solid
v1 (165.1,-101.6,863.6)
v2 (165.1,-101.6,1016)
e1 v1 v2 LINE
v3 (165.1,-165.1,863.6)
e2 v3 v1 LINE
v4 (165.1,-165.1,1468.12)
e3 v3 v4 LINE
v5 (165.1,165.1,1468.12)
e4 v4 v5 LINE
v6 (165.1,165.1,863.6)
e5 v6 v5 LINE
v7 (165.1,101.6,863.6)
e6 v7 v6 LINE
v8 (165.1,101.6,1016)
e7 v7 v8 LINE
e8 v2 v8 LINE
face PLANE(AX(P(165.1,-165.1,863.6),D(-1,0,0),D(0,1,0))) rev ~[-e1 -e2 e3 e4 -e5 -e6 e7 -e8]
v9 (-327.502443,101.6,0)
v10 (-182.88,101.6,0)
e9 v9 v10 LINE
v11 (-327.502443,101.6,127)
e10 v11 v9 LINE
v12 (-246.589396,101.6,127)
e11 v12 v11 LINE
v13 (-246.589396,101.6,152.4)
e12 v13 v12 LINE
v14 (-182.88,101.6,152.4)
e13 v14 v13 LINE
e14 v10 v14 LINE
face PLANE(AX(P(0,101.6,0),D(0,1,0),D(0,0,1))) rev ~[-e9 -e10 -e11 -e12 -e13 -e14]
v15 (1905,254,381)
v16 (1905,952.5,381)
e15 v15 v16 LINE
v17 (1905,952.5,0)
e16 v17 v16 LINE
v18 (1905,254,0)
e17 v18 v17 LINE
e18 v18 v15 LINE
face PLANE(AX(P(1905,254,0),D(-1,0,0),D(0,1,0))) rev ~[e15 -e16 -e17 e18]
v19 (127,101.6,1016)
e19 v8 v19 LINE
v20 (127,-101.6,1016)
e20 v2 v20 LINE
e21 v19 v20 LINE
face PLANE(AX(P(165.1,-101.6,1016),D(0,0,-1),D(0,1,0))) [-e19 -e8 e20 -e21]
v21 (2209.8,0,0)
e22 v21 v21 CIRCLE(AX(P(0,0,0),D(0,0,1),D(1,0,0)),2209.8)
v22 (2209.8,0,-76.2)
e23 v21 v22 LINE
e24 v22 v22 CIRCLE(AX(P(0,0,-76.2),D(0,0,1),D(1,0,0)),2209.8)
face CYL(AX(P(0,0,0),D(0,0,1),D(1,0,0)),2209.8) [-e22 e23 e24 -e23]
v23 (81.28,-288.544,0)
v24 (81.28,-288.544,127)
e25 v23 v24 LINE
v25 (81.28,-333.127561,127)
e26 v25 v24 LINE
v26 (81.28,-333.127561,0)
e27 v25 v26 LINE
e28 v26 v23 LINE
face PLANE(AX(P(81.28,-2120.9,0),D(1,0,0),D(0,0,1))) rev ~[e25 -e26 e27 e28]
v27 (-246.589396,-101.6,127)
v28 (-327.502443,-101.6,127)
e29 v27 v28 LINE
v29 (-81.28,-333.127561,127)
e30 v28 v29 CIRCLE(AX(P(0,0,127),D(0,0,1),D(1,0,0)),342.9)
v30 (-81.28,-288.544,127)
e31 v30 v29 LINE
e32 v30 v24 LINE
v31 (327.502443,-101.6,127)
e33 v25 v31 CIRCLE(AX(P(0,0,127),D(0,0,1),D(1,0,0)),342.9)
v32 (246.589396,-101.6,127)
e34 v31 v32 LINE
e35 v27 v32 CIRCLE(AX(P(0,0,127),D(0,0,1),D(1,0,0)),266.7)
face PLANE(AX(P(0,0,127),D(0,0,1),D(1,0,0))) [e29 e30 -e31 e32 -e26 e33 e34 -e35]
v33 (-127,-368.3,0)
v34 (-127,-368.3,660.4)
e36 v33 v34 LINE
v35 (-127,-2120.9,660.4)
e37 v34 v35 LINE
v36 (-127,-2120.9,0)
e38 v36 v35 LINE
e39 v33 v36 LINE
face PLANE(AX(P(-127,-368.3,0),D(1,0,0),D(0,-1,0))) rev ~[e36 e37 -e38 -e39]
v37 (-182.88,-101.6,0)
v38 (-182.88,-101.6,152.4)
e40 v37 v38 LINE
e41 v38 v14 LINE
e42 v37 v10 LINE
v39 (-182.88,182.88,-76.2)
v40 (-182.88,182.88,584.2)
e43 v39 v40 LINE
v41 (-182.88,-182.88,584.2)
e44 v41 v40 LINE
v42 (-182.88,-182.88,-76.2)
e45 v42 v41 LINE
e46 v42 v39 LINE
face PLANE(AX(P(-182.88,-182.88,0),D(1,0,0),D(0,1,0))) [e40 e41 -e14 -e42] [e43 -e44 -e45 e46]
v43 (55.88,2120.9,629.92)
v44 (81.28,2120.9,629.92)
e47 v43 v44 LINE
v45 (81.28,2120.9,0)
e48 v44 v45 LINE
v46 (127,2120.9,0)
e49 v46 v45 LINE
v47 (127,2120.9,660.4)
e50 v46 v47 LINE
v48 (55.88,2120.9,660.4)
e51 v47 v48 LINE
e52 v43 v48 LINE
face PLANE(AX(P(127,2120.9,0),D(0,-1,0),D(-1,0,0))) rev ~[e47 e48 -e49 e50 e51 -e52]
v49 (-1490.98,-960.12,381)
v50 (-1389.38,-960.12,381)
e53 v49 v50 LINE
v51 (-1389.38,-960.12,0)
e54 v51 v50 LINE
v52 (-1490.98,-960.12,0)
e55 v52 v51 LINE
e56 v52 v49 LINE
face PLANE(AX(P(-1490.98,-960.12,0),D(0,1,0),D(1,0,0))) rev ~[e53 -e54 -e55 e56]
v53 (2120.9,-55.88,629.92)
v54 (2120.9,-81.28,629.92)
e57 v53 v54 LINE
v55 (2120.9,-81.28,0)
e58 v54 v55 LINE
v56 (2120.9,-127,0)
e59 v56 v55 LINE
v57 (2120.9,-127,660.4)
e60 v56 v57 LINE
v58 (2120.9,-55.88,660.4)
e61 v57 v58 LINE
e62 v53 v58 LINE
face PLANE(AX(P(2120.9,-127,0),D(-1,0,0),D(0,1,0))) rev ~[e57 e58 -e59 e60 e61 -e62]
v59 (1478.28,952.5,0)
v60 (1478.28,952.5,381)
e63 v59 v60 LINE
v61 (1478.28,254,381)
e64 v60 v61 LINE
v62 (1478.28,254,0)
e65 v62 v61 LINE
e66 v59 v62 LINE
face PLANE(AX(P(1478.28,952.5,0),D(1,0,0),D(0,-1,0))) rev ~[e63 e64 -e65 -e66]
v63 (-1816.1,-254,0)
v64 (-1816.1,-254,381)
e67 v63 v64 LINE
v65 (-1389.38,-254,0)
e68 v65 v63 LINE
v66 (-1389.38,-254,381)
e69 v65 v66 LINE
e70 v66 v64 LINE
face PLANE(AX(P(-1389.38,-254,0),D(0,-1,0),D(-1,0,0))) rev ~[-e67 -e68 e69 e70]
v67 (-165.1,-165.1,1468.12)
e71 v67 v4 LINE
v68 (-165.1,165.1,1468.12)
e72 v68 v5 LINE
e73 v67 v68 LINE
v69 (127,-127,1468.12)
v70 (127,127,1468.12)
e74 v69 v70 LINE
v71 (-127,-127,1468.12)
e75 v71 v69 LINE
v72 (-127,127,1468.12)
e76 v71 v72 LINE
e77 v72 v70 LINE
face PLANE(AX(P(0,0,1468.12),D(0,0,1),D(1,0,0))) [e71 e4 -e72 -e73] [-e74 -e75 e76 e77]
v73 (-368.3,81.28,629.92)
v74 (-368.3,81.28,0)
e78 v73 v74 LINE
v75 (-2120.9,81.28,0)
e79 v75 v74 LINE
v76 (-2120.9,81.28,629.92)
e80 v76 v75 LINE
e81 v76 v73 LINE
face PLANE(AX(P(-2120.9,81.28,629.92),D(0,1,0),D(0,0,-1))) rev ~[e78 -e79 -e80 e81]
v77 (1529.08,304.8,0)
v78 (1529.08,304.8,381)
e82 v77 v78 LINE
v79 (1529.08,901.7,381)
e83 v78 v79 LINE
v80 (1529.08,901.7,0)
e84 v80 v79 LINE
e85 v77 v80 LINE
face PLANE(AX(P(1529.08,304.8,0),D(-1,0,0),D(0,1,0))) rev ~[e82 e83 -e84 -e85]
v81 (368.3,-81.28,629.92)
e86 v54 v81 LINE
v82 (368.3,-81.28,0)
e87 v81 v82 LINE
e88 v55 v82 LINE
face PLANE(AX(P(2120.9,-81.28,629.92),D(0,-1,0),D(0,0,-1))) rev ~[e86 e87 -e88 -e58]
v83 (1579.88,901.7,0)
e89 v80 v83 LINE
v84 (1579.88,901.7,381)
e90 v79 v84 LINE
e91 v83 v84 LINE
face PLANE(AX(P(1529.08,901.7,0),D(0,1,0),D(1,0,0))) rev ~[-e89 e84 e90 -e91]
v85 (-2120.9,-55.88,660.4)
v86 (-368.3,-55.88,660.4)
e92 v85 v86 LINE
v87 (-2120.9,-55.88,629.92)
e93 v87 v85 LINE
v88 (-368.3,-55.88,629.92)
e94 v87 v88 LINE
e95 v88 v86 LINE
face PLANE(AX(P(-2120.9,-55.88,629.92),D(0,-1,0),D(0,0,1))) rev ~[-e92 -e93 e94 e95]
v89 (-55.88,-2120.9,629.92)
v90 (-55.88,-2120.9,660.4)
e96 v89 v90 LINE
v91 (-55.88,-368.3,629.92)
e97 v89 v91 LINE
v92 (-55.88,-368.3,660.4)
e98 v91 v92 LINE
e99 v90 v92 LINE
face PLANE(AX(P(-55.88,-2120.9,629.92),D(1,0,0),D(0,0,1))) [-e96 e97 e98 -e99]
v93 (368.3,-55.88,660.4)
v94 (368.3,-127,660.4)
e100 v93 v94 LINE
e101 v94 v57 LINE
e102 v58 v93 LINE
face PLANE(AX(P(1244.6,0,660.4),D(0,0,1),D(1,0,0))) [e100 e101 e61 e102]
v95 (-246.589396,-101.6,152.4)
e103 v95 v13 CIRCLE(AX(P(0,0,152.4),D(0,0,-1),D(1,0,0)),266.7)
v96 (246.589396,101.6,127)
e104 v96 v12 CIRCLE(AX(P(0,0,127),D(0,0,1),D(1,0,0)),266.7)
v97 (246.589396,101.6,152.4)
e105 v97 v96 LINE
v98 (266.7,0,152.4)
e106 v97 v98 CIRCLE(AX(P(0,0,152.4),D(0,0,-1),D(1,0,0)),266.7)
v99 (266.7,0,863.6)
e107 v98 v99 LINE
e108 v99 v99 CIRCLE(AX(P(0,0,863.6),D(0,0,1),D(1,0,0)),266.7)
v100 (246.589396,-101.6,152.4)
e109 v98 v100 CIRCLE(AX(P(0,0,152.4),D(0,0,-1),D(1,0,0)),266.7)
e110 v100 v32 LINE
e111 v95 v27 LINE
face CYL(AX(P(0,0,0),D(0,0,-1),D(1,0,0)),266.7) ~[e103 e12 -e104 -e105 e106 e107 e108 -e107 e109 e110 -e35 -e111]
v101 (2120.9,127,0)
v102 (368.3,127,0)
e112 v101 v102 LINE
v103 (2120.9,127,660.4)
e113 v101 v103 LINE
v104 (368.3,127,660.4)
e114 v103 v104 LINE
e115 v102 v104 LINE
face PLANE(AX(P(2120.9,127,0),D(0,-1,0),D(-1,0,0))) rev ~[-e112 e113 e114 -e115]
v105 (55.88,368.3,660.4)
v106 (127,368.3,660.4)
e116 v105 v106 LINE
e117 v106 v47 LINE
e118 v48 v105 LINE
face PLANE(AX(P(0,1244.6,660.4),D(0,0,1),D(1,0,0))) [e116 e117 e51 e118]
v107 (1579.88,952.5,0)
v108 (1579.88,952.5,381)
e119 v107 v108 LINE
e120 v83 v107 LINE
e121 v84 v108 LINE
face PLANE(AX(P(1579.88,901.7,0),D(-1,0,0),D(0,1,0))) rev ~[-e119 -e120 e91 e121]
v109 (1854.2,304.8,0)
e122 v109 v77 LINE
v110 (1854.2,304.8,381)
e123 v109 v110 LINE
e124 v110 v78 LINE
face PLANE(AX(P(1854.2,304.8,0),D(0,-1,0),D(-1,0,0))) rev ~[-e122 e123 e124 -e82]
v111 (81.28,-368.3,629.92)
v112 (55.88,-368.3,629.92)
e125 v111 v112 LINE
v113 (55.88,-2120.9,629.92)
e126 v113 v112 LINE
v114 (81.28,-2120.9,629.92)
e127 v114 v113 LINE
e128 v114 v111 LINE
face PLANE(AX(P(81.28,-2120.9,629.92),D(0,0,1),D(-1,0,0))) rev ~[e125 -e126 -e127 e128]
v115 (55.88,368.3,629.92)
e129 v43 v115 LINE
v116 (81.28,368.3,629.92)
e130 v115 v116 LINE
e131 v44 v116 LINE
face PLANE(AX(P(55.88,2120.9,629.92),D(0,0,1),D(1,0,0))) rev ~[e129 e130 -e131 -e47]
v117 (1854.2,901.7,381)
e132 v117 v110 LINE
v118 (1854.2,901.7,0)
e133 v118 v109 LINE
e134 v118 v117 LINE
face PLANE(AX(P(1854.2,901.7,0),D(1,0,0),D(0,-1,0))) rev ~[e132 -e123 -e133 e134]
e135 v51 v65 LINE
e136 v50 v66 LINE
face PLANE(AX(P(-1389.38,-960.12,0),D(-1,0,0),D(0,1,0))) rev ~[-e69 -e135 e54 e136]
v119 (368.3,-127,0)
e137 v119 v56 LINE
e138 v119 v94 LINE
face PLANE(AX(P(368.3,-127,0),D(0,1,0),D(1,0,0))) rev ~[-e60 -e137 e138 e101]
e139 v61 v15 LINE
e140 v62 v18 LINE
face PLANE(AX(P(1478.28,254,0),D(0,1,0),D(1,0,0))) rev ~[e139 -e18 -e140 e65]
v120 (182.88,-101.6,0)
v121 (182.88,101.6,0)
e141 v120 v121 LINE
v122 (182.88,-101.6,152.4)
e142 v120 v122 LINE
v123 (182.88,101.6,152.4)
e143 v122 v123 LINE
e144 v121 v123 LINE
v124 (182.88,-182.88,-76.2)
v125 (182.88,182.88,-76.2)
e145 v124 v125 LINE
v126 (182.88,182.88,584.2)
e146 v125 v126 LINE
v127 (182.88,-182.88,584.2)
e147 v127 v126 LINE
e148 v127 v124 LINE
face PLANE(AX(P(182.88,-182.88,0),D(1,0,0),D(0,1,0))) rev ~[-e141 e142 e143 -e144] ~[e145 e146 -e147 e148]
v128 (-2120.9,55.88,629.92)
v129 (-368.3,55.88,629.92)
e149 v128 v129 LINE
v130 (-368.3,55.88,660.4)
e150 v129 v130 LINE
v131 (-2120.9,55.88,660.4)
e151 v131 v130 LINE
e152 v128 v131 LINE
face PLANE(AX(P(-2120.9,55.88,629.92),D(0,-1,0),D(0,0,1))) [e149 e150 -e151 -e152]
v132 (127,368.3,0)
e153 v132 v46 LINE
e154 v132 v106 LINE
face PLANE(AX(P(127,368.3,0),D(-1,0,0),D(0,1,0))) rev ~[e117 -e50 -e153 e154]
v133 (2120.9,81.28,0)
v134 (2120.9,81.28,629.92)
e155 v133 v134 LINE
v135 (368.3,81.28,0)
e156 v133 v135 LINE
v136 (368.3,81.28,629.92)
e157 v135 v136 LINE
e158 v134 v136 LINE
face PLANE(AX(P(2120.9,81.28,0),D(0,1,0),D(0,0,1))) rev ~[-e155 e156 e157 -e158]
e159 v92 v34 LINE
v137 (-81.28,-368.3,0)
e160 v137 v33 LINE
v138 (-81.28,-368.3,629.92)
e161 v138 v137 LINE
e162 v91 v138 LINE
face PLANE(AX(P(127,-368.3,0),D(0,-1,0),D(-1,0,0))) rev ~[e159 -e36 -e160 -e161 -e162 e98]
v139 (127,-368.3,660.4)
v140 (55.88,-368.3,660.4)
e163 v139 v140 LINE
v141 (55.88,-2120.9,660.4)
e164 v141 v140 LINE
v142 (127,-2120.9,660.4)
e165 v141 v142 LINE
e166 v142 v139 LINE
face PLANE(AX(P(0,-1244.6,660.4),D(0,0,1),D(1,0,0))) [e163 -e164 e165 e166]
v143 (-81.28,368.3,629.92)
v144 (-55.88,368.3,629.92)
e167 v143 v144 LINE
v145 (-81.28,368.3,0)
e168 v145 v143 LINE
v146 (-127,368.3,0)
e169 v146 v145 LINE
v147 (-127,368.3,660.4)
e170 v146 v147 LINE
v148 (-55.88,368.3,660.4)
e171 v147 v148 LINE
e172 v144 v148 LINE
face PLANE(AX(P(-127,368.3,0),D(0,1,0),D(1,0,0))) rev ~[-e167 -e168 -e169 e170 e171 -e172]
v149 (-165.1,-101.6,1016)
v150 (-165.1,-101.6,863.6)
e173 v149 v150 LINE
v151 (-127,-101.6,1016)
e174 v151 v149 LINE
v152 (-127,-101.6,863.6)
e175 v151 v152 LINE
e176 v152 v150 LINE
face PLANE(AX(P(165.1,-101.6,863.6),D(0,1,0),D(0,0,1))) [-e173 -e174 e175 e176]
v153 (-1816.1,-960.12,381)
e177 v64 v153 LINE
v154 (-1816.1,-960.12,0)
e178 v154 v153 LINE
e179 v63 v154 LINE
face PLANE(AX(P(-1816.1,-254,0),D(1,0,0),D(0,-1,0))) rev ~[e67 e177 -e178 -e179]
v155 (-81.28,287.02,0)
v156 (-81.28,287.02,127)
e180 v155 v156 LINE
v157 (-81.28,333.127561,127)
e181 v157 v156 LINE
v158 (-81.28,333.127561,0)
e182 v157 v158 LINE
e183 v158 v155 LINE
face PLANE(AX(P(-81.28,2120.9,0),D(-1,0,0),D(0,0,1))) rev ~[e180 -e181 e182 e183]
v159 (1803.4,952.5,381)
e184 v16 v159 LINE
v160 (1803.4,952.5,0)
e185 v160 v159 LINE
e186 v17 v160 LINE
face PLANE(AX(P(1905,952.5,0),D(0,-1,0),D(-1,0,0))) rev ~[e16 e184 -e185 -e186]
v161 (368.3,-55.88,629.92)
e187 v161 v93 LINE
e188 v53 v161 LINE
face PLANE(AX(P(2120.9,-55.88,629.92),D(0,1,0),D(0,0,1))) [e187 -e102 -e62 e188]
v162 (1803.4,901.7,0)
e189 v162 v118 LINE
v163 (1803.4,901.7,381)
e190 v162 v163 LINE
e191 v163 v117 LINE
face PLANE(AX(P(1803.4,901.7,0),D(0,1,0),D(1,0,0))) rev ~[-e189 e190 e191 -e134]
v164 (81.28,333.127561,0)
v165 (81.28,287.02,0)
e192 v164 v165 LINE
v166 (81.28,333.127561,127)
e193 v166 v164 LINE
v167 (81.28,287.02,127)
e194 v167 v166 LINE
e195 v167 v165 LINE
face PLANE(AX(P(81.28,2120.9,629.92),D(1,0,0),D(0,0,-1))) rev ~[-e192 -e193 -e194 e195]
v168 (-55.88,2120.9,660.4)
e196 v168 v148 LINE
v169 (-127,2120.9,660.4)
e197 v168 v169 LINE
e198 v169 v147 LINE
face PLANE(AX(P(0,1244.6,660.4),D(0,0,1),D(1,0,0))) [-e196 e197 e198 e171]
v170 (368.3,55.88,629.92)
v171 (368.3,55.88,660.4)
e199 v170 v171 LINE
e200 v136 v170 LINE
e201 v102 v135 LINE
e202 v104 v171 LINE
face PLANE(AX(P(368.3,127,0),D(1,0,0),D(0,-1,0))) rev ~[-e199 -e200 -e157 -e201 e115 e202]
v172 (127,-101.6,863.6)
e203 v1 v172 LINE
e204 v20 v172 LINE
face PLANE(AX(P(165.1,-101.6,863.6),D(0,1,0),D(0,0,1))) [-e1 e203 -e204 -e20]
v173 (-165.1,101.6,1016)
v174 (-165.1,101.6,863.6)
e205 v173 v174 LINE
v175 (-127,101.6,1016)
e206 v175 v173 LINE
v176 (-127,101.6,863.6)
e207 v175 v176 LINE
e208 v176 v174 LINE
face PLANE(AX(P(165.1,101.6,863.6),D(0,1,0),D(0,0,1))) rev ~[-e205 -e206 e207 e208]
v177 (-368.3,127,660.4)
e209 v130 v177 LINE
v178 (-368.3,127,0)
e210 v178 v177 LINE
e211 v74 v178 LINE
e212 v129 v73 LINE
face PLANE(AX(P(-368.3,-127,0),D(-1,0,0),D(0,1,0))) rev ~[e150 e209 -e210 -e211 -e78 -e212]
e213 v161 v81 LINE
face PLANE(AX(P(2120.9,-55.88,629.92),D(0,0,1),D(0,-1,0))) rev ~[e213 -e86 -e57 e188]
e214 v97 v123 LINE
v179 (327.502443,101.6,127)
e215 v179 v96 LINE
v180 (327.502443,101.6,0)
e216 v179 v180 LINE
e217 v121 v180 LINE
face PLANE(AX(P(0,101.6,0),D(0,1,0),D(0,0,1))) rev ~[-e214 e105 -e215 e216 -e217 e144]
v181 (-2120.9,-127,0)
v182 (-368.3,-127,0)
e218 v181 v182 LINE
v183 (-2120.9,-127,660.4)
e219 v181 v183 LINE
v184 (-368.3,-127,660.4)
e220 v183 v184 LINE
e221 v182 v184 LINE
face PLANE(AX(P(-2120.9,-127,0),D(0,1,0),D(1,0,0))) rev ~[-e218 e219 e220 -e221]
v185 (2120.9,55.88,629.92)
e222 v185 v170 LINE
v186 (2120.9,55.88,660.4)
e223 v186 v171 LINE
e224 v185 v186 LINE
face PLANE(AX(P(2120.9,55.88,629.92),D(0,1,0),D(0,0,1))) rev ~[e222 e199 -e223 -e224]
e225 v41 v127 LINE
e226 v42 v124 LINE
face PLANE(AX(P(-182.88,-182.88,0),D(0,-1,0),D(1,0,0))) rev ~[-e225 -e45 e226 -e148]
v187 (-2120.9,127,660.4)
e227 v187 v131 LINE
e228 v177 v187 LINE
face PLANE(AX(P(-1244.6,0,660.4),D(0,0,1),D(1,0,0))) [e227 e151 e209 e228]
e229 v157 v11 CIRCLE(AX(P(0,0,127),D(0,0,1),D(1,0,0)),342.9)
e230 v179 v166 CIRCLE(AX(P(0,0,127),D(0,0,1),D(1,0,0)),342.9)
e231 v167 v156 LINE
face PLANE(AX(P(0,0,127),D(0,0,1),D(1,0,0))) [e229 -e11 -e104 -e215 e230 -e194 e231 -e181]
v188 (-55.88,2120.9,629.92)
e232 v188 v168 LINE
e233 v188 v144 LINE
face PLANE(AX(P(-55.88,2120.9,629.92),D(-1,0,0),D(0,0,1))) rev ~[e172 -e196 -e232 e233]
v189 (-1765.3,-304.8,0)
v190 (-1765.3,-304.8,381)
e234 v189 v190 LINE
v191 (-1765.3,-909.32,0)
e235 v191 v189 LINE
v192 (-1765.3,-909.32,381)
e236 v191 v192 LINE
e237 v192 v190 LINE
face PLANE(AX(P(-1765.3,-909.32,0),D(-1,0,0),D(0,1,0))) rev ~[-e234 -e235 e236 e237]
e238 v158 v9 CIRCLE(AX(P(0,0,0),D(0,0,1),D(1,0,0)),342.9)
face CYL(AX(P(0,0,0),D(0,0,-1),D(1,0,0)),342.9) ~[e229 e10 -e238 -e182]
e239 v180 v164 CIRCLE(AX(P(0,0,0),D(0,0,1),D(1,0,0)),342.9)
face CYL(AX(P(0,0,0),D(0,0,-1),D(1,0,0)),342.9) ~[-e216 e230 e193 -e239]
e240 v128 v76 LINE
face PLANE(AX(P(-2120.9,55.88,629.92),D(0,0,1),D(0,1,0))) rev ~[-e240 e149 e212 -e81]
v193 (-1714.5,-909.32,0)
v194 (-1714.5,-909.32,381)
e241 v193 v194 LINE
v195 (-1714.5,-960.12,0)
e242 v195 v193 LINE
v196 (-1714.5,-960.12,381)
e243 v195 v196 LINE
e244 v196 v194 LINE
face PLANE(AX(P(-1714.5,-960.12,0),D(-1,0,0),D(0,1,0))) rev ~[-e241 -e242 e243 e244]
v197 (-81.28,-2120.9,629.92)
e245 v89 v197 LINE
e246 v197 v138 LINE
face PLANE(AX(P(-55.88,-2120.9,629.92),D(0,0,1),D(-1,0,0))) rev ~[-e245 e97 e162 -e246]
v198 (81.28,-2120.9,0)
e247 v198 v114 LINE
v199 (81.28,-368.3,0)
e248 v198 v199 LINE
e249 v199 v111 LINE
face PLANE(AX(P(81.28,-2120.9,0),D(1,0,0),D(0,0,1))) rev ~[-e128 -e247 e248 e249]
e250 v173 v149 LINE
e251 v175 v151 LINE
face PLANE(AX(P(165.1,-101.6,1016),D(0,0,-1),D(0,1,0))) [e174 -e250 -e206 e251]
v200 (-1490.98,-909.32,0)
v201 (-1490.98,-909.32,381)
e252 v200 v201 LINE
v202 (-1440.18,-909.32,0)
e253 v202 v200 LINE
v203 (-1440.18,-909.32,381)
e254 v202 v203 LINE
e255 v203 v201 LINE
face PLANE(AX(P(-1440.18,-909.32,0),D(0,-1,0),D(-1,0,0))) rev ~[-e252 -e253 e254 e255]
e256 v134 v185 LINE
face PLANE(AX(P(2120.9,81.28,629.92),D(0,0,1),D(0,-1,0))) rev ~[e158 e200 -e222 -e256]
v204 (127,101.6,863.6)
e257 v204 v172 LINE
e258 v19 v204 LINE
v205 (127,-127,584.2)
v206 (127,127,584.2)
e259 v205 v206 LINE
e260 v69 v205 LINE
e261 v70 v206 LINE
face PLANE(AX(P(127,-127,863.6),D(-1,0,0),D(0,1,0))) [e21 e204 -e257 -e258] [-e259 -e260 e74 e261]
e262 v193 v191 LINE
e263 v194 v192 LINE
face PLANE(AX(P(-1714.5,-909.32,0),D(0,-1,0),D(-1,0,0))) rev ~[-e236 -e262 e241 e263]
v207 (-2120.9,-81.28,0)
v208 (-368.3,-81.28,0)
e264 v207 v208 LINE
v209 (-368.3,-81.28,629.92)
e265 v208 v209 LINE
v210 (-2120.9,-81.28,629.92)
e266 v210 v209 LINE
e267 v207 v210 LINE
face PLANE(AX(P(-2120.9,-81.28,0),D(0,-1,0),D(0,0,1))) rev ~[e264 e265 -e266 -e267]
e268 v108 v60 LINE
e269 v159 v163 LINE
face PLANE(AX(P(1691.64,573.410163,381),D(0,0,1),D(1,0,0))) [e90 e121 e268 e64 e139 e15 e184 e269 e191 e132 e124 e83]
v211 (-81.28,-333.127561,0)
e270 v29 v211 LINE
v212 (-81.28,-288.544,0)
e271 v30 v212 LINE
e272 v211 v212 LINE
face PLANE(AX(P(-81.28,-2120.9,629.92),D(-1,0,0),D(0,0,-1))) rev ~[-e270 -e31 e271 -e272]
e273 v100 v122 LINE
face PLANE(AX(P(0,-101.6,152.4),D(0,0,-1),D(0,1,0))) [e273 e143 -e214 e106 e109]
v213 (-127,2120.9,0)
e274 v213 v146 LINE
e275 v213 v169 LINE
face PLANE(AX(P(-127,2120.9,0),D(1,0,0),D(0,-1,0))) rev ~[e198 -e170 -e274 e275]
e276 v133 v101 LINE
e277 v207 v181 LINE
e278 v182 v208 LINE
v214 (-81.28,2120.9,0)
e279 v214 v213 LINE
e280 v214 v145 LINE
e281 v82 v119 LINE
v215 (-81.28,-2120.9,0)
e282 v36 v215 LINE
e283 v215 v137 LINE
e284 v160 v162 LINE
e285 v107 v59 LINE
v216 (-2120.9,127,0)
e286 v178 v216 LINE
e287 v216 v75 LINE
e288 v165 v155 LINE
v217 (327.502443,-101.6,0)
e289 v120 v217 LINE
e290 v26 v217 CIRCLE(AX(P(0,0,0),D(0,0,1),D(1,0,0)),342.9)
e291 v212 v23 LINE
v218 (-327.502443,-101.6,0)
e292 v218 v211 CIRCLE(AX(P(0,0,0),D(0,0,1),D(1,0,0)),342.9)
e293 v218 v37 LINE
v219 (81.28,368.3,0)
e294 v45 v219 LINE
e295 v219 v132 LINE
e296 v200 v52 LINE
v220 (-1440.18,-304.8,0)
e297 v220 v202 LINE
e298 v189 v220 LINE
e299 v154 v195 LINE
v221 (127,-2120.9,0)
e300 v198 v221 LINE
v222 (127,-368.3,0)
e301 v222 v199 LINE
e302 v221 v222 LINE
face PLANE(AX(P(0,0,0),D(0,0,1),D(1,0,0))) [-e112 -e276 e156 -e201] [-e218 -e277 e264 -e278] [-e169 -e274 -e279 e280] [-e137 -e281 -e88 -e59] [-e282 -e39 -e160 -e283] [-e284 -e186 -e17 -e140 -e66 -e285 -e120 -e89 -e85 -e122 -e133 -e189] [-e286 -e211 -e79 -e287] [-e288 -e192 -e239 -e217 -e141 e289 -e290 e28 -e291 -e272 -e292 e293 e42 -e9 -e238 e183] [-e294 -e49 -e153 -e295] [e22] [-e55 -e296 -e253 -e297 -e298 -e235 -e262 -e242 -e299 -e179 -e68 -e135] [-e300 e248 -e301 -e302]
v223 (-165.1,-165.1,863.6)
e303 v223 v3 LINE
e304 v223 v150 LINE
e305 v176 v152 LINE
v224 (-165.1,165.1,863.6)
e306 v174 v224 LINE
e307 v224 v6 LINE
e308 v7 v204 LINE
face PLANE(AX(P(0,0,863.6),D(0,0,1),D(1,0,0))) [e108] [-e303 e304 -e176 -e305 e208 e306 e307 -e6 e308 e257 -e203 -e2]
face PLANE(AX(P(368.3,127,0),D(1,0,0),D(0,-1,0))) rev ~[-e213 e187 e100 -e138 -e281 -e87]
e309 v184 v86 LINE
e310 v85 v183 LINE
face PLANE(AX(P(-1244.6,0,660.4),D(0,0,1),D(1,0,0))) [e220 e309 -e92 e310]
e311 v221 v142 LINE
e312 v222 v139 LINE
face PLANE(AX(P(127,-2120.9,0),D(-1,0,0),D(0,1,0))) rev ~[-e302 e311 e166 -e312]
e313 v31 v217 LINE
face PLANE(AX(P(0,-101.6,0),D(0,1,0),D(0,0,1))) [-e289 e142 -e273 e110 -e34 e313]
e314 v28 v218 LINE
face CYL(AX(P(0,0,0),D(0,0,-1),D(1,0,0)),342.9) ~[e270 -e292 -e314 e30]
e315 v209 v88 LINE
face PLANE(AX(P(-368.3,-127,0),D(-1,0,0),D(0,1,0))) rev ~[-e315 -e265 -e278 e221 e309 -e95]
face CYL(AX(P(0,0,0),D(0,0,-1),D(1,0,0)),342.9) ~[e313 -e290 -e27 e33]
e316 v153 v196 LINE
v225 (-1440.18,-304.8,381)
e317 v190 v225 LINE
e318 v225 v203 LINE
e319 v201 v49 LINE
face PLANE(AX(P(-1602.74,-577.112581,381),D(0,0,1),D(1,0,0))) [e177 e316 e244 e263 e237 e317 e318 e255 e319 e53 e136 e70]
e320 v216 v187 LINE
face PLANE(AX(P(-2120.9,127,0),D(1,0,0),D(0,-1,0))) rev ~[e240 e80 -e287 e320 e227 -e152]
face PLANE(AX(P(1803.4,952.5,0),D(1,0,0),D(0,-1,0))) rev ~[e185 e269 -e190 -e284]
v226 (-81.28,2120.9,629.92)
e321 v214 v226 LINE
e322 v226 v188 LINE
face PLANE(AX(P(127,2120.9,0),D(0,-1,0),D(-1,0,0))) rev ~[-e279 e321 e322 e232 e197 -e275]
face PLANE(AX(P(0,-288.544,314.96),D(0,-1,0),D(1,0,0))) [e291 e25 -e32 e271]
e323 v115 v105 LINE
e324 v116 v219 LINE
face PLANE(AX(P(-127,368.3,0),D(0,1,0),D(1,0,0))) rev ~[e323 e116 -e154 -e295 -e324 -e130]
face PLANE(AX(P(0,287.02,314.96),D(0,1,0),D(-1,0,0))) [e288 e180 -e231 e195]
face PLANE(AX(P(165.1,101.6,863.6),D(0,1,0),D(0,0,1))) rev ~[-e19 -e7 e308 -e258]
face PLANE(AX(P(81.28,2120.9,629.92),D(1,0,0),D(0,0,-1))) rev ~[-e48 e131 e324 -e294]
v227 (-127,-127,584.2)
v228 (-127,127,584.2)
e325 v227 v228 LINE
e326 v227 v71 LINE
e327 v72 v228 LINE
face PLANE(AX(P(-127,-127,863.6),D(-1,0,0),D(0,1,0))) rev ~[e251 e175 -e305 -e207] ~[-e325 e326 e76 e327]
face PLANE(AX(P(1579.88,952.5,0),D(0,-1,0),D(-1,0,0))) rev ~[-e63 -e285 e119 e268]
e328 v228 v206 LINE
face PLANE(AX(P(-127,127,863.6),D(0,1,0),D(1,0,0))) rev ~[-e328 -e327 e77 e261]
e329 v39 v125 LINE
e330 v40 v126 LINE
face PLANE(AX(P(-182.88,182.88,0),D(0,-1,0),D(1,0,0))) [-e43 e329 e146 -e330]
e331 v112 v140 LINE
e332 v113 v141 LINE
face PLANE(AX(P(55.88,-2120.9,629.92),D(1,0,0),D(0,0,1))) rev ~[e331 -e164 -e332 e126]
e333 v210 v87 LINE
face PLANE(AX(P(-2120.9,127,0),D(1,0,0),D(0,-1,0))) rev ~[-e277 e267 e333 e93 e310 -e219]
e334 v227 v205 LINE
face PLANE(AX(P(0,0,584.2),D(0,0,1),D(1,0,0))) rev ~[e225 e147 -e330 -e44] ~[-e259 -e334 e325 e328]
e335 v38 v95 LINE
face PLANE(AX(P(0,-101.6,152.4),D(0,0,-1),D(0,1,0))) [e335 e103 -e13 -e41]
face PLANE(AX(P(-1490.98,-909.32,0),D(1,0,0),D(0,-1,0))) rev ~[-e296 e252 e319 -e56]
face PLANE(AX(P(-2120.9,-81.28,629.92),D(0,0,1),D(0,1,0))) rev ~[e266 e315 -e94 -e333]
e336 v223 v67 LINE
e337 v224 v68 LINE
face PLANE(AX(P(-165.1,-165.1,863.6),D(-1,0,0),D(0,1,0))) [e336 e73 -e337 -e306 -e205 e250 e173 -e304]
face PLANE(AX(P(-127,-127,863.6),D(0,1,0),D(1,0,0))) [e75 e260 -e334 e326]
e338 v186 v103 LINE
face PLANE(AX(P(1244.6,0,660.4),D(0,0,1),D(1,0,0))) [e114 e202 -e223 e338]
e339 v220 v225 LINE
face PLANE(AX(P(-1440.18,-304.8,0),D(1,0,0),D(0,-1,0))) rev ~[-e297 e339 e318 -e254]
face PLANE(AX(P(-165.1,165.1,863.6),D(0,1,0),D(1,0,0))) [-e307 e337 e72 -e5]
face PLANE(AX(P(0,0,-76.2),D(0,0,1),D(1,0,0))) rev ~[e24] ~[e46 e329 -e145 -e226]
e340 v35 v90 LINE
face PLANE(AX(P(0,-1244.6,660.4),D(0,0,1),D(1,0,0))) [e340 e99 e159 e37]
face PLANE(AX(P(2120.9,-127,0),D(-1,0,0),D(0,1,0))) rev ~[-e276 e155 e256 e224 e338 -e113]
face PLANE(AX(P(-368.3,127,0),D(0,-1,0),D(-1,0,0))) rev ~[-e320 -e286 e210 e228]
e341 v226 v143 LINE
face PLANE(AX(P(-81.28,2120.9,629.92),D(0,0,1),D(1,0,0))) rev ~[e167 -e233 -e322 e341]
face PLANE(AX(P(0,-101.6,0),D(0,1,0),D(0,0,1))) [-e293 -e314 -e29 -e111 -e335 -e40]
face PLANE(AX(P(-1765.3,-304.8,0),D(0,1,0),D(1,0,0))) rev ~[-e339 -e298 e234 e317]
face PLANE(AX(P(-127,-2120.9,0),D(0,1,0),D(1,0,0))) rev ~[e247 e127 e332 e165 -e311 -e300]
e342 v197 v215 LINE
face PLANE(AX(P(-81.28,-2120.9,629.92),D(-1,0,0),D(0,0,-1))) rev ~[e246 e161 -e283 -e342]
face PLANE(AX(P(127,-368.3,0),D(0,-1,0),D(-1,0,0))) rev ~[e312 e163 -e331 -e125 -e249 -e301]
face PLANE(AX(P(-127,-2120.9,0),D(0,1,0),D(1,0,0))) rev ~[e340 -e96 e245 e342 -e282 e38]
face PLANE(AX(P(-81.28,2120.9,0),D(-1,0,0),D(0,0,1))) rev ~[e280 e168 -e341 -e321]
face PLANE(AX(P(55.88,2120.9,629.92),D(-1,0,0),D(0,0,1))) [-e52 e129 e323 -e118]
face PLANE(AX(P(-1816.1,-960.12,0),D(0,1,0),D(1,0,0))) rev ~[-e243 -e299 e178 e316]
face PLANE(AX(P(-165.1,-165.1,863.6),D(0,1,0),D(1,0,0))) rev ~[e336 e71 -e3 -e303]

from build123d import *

# Parameters (mm, degrees)
F0_R      = 2209.8
F0_R_2    = 342.9
F0_R_3    = 266.7
F0_W      = 365.76
F0_H      = 365.76
F0_W_2    = 223.52
F0_H_2    = 50.8
F1_DEPTH  = 76.2
F0_W_3    = 355.6
F0_H_3    = 355.6
F0_W_4    = 254
F0_H_4    = 254
F2_DEPTH  = 863.6
F3_DEPTH  = 584.2
F4_W      = 330.2
F4_H      = 330.2
F4_W_2    = 254
F4_H_2    = 254
F5_DEPTH  = 604.52
F6_DEPTH  = 127
F7_W      = 203.2
F7_H      = 152.4
F8_DEPTH  = 350.52
F9_DEPTH  = 660.4
F10_W     = 111.76
F10_H     = 30.48
F11_DEPTH = 1832.356
F12_W     = 111.76
F12_H     = 31.626664176
F13_DEPTH = 1793.24
F14_W     = 111.76
F14_H     = 31.626664176
F15_DEPTH = 1833.88
F16_W     = 111.76
F16_H     = 31.626664176
F17_DEPTH = 1811.02
F18_DEPTH = 381
F19_W     = 203.2
F19_H     = 152.4
F20_DEPTH = 347.472


# Not quite as in the source:
# - a feature names something its author has since deleted; it is built from what else it names


with BuildPart() as f1:
    # F0 (on Top) → F1 (new body)
    with BuildSketch(Plane.XY):
        Circle(F0_R)
        Polygon((-1490.98, -960.12), (-1714.5, -960.12), (-1816.1, -960.12), (-1816.1, -254), (-1389.38, -254), (-1389.38, -960.12), align=None, mode=Mode.SUBTRACT)
        Polygon((127, -2120.9), (-127, -2120.9), (-127, -368.3), (-1.175e-06, -368.3), (127, -368.3), align=None, mode=Mode.SUBTRACT)
        Polygon((-368.3, 127), (-368.3, 5.095e-07), (-368.3, -127), (-2120.9, -127), (-2120.9, 127), align=None, mode=Mode.SUBTRACT)
        with BuildLine():
            ThreePointArc((368.3, 0), (260.4274270956, -260.4274279264), (-1.175e-06, -368.3))
            ThreePointArc((-1.175e-06, -368.3), (-260.4274281066, -260.4274269154), (-368.3, 5.095e-07))
            ThreePointArc((-368.3, 5.095e-07), (-260.4274272736, 260.4274277484), (1.62e-07, 368.3))
            ThreePointArc((1.62e-07, 368.3), (260.4274275683, 260.4274274537), (368.3, 0))
        make_face(mode=Mode.SUBTRACT)
        Polygon((368.3, -127), (368.3, 0), (368.3, 127), (2120.9, 127), (2120.9, -127), align=None, mode=Mode.SUBTRACT)
        Polygon((1579.88, 952.5), (1803.4, 952.5), (1905, 952.5), (1905, 254), (1478.28, 254), (1478.28, 952.5), align=None, mode=Mode.SUBTRACT)
        Polygon((127, 368.3), (1.62e-07, 368.3), (-127, 368.3), (-127, 2120.9), (127, 2120.9), align=None, mode=Mode.SUBTRACT)
        Polygon((-127, 368.3), (1.62e-07, 368.3), (127, 368.3), (127, 2120.9), (-127, 2120.9), align=None)
        Polygon((368.3, 127), (368.3, 0), (368.3, -127), (2120.9, -127), (2120.9, 127), align=None)
        Polygon((-368.3, -127), (-368.3, 5.095e-07), (-368.3, 127), (-2120.9, 127), (-2120.9, -127), align=None)
        Polygon((-127, -368.3), (-127, -2120.9), (127, -2120.9), (127, -368.3), (-1.175e-06, -368.3), align=None)
        with BuildLine():
            ThreePointArc((-368.3, 5.095e-07), (-260.4274281066, -260.4274269154), (-1.175e-06, -368.3))
            ThreePointArc((-1.175e-06, -368.3), (260.4274270956, -260.4274279264), (368.3, 0))
            ThreePointArc((368.3, 0), (260.4274275683, 260.4274274537), (1.62e-07, 368.3))
            ThreePointArc((1.62e-07, 368.3), (-260.4274272736, 260.4274277484), (-368.3, 5.095e-07))
        make_face()
        Circle(F0_R_2, mode=Mode.SUBTRACT)
        Circle(F0_R_2)
        Circle(F0_R_3, mode=Mode.SUBTRACT)
        Circle(F0_R_3)
        Rectangle(F0_W, F0_H, mode=Mode.SUBTRACT)
        Polygon((-1440.18, -304.8), (-1765.3, -304.8), (-1765.3, -909.32), (-1714.5, -909.32), (-1490.98, -909.32), (-1440.18, -909.32), align=None)
        Polygon((1529.08, 304.8), (1854.2, 304.8), (1854.2, 901.7), (1803.4, 901.7), (1579.88, 901.7), (1529.08, 901.7), align=None)
        Polygon((-1765.3, -909.32), (-1765.3, -304.8), (-1440.18, -304.8), (-1440.18, -909.32), (-1490.98, -909.32), (-1490.98, -960.12), (-1389.38, -960.12), (-1389.38, -254), (-1816.1, -254), (-1816.1, -960.12), (-1714.5, -960.12), (-1714.5, -909.32), align=None)
        Polygon((1854.2, 901.7), (1854.2, 304.8), (1529.08, 304.8), (1529.08, 901.7), (1579.88, 901.7), (1579.88, 952.5), (1478.28, 952.5), (1478.28, 254), (1905, 254), (1905, 952.5), (1803.4, 952.5), (1803.4, 901.7), align=None)
        with Locations((1691.64, 927.1)):
            Rectangle(F0_W_2, F0_H_2)
        with Locations((-1602.74, -934.72)):
            Rectangle(F0_W_2, F0_H_2)
    extrude(amount=-F1_DEPTH)

    # F0 (on Top) → F2 (join)
    with BuildSketch(Plane.XY):
        Circle(F0_R_3)
        Rectangle(F0_W, F0_H, mode=Mode.SUBTRACT)
        Rectangle(F0_W, F0_H)
        Rectangle(F0_W_3, F0_H_3, mode=Mode.SUBTRACT)
        Rectangle(F0_W_3, F0_H_3)
        Rectangle(F0_W_4, F0_H_4, mode=Mode.SUBTRACT)
    extrude(amount=F2_DEPTH)

    # F0 (on Top) → F3 (cut)
    with BuildSketch(Plane.XY):
        Rectangle(F0_W, F0_H)
        Rectangle(F0_W_3, F0_H_3, mode=Mode.SUBTRACT)
        Rectangle(F0_W_3, F0_H_3)
        Rectangle(F0_W_4, F0_H_4, mode=Mode.SUBTRACT)
        Rectangle(F0_W_4, F0_H_4)
    extrude(amount=F3_DEPTH, mode=Mode.SUBTRACT)

    # F4 (on face) → F5 (join)
    with BuildSketch(Plane.XY.offset(863.6)):
        Rectangle(F4_W, F4_H)
        Rectangle(F4_W_2, F4_H_2, mode=Mode.SUBTRACT)
    extrude(amount=F5_DEPTH)

    # F0 (on Top) → F6 (join)
    with BuildSketch(Plane.XY):
        Circle(F0_R_2)
        Circle(F0_R_3, mode=Mode.SUBTRACT)
    extrude(amount=F6_DEPTH)

    # F7 (on Right) → F8 (cut, symmetric)
    with BuildSketch(Plane.YZ):
        with Locations((0, 76.2)):
            Rectangle(F7_W, F7_H)
    extrude(amount=F8_DEPTH, both=True, mode=Mode.SUBTRACT)

    # F0 (on Top) → F9 (join)
    with BuildSketch(Plane.XY):
        Polygon((-127, -368.3), (-127, -2120.9), (127, -2120.9), (127, -368.3), (-1.175e-06, -368.3), align=None)
        Polygon((-368.3, -127), (-368.3, 5.095e-07), (-368.3, 127), (-2120.9, 127), (-2120.9, -127), align=None)
        Polygon((-127, 368.3), (1.62e-07, 368.3), (127, 368.3), (127, 2120.9), (-127, 2120.9), align=None)
        Polygon((368.3, 127), (368.3, 0), (368.3, -127), (2120.9, -127), (2120.9, 127), align=None)
    extrude(amount=F9_DEPTH)

    # F10 (on face) → F11 (cut)
    with BuildSketch(Plane.XZ.offset(2120.9)):
        Polygon((-55.88, 629.92), (-81.28, 629.92), (-81.28, 0), (81.28, 0), (81.28, 629.92), (55.88, 629.92), align=None)
        with Locations((0, 645.16)):
            Rectangle(F10_W, F10_H)
    extrude(amount=-F11_DEPTH, mode=Mode.SUBTRACT)

    # F12 (on face) → F13 (cut)
    with BuildSketch(Plane(origin=(-2120.9, 0, 0), x_dir=(0, -1, 0), z_dir=(-1, 0, 0))):
        Polygon((-55.88, 629.92), (-81.28, 629.92), (-81.28, 0), (81.28, 0), (81.28, 629.92), (55.88, 629.92), align=None)
        with Locations((0, 645.733332088)):
            Rectangle(F12_W, F12_H)
    extrude(amount=-F13_DEPTH, mode=Mode.SUBTRACT)

    # F14 (on face) → F15 (cut)
    with BuildSketch(Plane(origin=(0, 2120.9, 0), x_dir=(-1, 0, 0), z_dir=(0, 1, 0))):
        Polygon((-55.88, 629.92), (-81.28, 629.92), (-81.28, 0), (81.28, 0), (81.28, 629.92), (55.88, 629.92), align=None)
        with Locations((0, 645.733332088)):
            Rectangle(F14_W, F14_H)
    extrude(amount=-F15_DEPTH, mode=Mode.SUBTRACT)

    # F16 (on face) → F17 (cut)
    with BuildSketch(Plane.YZ.offset(2120.9)):
        Polygon((-55.88, 629.92), (-81.28, 629.92), (-81.28, 0), (81.28, 0), (81.28, 629.92), (55.88, 629.92), align=None)
        with Locations((0, 645.733332088)):
            Rectangle(F16_W, F16_H)
    extrude(amount=-F17_DEPTH, mode=Mode.SUBTRACT)

    # F0 (on Top) → F18 (join)
    with BuildSketch(Plane.XY):
        Polygon((-1765.3, -909.32), (-1765.3, -304.8), (-1440.18, -304.8), (-1440.18, -909.32), (-1490.98, -909.32), (-1490.98, -960.12), (-1389.38, -960.12), (-1389.38, -254), (-1816.1, -254), (-1816.1, -960.12), (-1714.5, -960.12), (-1714.5, -909.32), align=None)
        Polygon((1854.2, 901.7), (1854.2, 304.8), (1529.08, 304.8), (1529.08, 901.7), (1579.88, 901.7), (1579.88, 952.5), (1478.28, 952.5), (1478.28, 254), (1905, 254), (1905, 952.5), (1803.4, 952.5), (1803.4, 901.7), align=None)
    extrude(amount=F18_DEPTH)

    # F19 (on face) → F20 (cut)
    with BuildSketch(Plane.YZ.offset(165.1)):
        with Locations((0, 939.8)):
            Rectangle(F19_W, F19_H)
    extrude(amount=-F20_DEPTH, mode=Mode.SUBTRACT)


solid = f1.part
